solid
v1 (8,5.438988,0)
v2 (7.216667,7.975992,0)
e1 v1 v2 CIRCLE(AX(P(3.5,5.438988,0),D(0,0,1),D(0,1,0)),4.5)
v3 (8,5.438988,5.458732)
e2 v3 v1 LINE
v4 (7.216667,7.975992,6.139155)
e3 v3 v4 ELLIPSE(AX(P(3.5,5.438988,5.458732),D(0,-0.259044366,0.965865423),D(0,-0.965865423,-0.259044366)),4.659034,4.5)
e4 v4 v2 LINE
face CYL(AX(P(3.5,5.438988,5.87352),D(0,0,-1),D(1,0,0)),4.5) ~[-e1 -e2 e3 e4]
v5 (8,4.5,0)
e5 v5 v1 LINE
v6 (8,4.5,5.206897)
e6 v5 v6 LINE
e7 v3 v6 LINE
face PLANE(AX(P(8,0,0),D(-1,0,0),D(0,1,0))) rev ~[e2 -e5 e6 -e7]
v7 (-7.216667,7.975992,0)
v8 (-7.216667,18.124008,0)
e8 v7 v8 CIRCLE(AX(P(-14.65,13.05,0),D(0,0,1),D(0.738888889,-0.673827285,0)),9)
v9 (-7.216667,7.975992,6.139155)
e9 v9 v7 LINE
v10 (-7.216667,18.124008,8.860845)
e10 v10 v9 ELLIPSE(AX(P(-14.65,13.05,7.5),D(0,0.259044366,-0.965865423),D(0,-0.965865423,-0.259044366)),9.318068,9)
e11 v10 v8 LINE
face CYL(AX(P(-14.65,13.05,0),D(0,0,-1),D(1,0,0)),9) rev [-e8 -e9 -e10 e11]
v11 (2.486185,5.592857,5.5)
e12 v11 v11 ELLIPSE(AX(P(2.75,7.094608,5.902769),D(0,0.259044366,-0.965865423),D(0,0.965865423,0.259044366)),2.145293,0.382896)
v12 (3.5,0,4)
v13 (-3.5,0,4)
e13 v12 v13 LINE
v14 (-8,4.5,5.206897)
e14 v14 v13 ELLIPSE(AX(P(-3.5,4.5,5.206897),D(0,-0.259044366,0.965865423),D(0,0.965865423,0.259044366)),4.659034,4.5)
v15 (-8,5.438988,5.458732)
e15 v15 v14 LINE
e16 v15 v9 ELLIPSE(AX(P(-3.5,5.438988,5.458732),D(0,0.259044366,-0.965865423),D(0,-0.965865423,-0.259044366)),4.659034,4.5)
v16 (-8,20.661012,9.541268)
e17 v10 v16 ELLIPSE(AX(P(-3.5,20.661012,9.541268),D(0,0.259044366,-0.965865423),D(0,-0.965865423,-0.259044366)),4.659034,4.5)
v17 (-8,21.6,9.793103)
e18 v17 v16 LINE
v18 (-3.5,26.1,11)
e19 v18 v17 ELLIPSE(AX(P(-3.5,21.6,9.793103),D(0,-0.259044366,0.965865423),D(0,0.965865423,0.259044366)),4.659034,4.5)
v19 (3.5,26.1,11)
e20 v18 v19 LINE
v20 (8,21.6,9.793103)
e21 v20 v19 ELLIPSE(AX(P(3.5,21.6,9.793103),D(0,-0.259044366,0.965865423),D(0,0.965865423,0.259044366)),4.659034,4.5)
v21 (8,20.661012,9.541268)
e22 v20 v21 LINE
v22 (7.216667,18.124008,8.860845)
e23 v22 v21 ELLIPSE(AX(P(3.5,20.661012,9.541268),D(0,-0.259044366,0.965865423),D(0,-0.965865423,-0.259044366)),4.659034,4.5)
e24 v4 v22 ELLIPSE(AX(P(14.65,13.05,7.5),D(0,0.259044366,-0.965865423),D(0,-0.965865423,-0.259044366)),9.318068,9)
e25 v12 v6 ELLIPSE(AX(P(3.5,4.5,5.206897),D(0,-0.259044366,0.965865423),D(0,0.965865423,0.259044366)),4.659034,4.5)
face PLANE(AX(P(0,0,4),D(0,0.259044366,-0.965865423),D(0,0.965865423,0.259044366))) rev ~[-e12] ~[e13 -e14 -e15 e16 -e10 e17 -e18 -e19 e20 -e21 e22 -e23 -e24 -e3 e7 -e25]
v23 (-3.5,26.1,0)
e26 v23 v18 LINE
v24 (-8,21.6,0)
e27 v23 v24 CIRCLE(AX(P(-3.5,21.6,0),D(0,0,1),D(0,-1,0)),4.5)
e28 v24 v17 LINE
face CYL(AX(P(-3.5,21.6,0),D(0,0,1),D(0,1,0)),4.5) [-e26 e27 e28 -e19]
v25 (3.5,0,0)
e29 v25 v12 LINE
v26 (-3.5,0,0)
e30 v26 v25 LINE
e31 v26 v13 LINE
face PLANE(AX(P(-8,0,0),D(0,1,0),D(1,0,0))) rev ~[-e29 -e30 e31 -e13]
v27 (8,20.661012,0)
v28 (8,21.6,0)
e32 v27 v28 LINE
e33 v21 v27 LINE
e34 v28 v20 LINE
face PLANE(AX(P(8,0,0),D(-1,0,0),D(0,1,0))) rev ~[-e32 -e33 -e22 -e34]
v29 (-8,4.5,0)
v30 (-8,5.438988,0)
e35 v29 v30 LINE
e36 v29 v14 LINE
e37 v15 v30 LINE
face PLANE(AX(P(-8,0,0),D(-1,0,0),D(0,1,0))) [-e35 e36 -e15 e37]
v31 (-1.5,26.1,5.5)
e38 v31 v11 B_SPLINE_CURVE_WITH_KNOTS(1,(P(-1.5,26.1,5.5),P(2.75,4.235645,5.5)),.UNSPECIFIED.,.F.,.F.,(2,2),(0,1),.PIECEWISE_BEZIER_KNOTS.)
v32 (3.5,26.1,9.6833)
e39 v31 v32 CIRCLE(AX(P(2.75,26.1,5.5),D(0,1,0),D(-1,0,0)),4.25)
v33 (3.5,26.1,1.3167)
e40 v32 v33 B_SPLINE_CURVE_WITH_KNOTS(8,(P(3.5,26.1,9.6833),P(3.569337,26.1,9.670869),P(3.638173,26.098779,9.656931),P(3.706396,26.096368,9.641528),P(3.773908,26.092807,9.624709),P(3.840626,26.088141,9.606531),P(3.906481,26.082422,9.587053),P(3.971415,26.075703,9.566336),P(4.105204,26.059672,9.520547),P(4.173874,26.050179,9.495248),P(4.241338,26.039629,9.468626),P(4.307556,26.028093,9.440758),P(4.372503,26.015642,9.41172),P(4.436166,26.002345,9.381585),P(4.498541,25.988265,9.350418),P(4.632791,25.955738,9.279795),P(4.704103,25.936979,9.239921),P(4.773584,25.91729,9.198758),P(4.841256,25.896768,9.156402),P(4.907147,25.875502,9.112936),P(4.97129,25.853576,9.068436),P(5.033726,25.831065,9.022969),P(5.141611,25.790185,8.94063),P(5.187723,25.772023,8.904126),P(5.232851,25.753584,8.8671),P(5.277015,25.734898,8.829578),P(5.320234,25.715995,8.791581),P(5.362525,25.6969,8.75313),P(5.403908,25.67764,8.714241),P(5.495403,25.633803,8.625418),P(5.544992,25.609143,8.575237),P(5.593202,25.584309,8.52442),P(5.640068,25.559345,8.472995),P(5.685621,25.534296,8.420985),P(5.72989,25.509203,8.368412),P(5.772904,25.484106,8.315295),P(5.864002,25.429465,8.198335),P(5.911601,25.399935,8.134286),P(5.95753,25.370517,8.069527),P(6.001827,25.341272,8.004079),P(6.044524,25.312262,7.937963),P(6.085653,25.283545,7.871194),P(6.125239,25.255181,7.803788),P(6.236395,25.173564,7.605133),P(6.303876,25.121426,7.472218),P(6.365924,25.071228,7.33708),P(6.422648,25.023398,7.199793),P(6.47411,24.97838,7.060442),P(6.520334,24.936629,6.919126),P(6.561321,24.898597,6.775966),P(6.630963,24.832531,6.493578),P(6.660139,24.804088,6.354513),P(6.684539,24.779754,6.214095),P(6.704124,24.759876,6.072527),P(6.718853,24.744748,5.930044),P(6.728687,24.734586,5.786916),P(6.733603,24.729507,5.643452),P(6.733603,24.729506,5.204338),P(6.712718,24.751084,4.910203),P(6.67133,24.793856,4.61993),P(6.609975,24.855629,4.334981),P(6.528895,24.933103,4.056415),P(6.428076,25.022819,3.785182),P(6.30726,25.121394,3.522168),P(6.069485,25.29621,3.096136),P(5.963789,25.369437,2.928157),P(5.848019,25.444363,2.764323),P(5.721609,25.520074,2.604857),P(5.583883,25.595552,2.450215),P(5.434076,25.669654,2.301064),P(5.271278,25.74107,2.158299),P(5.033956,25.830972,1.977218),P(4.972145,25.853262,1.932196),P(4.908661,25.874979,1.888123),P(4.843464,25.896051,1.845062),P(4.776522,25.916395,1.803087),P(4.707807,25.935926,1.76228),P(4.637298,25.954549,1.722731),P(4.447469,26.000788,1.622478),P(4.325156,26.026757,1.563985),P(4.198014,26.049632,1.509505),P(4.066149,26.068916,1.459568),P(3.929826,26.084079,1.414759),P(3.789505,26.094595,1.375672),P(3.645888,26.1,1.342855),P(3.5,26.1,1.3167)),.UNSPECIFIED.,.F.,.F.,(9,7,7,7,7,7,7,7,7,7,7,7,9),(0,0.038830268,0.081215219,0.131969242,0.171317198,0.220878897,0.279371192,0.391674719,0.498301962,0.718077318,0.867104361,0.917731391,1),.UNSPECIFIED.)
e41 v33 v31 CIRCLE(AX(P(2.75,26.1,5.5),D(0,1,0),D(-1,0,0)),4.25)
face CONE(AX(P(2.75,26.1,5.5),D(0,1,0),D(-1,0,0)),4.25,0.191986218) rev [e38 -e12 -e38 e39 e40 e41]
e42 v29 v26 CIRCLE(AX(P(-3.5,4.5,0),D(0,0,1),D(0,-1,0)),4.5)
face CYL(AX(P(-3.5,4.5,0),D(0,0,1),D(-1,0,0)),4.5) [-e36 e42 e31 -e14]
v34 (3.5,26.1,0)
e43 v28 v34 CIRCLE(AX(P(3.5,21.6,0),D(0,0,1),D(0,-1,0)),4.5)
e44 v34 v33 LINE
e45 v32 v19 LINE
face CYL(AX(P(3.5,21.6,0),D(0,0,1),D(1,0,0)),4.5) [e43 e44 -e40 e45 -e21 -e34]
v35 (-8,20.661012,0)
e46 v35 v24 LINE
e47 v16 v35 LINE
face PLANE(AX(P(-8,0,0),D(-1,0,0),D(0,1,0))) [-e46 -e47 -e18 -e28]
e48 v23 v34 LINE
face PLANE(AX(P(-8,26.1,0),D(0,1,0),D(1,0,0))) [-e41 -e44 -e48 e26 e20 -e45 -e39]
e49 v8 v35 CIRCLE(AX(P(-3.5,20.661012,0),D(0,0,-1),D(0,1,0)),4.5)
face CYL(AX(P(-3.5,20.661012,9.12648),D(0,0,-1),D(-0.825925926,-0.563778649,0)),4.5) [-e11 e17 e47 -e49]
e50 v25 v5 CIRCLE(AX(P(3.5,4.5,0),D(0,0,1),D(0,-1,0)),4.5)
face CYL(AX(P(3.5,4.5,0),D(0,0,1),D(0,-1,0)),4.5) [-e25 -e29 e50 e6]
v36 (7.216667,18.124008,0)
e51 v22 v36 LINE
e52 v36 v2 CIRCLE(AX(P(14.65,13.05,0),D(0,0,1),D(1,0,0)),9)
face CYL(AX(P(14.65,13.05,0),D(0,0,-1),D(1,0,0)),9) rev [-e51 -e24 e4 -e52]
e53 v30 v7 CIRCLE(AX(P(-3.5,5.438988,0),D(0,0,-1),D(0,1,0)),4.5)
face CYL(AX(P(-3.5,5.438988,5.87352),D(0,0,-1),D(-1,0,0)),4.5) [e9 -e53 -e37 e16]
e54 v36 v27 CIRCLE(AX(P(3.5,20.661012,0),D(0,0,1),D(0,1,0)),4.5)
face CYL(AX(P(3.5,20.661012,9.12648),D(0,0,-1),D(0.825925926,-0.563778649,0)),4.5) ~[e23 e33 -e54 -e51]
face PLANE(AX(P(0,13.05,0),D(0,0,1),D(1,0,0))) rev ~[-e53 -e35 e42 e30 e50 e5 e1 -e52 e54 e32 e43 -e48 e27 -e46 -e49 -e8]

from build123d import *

# Parameters (mm, degrees)
F0_W     = 16
F0_H     = 26.1
F1_DEPTH = 11
F2_R     = 9
F3_DEPTH = 25
F5_DEPTH = 12.5
F6_R     = 4.5
F7_R     = 4.25


# Not quite as in the source:
# - an extrude whose draft closes it to a point is written as a loft to that point


with BuildPart() as f1:
    # F0 (on Top) → F1 (new body)
    with BuildSketch(Plane.XY):
        with Locations((0, 13.05)):
            Rectangle(F0_W, F0_H)
    extrude(amount=F1_DEPTH)

    # F2 (on Top) → F3 (cut)
    with BuildSketch(Plane.XY):
        with Locations((-14.65, 13.05)):
            Circle(F2_R)
        with Locations((14.65, 13.05)):
            Circle(F2_R)
    extrude(amount=F3_DEPTH, mode=Mode.SUBTRACT)

    # F4 (on Right) → F5 (cut, symmetric)
    with BuildSketch(Plane.YZ):
        Polygon((0, 4), (26.1, 11), (0, 11), align=None)
    extrude(amount=F5_DEPTH, both=True, mode=Mode.SUBTRACT)

    # F6
    f6_edges = [f1.edges().sort_by_distance(p)[0] for p in [
        (-8, 26.1, 5.5),
        (-8, 6.985554, 2.93676),
        (-8, 19.114446, 4.56324),
        (-8, 0, 2),
        (8, 0, 2),
        (8, 6.985554, 2.93676),
        (8, 19.114446, 4.56324),
        (8, 26.1, 5.5),
    ]]
    fillet(f6_edges, radius=F6_R)

    # F7 (on face) → F8 section 0
    with BuildSketch(Plane(origin=(0, 26.1, 0), x_dir=(-1, 0, 0), z_dir=(0, 1, 0)), mode=Mode.PRIVATE) as f8_s0:
        with Locations((-2.75, 5.5)):
            Circle(F7_R)
    loft([f8_s0.sketch, Vertex(2.75, 4.2356454321, 5.5)], ruled=True, mode=Mode.SUBTRACT)


solid = f1.part
